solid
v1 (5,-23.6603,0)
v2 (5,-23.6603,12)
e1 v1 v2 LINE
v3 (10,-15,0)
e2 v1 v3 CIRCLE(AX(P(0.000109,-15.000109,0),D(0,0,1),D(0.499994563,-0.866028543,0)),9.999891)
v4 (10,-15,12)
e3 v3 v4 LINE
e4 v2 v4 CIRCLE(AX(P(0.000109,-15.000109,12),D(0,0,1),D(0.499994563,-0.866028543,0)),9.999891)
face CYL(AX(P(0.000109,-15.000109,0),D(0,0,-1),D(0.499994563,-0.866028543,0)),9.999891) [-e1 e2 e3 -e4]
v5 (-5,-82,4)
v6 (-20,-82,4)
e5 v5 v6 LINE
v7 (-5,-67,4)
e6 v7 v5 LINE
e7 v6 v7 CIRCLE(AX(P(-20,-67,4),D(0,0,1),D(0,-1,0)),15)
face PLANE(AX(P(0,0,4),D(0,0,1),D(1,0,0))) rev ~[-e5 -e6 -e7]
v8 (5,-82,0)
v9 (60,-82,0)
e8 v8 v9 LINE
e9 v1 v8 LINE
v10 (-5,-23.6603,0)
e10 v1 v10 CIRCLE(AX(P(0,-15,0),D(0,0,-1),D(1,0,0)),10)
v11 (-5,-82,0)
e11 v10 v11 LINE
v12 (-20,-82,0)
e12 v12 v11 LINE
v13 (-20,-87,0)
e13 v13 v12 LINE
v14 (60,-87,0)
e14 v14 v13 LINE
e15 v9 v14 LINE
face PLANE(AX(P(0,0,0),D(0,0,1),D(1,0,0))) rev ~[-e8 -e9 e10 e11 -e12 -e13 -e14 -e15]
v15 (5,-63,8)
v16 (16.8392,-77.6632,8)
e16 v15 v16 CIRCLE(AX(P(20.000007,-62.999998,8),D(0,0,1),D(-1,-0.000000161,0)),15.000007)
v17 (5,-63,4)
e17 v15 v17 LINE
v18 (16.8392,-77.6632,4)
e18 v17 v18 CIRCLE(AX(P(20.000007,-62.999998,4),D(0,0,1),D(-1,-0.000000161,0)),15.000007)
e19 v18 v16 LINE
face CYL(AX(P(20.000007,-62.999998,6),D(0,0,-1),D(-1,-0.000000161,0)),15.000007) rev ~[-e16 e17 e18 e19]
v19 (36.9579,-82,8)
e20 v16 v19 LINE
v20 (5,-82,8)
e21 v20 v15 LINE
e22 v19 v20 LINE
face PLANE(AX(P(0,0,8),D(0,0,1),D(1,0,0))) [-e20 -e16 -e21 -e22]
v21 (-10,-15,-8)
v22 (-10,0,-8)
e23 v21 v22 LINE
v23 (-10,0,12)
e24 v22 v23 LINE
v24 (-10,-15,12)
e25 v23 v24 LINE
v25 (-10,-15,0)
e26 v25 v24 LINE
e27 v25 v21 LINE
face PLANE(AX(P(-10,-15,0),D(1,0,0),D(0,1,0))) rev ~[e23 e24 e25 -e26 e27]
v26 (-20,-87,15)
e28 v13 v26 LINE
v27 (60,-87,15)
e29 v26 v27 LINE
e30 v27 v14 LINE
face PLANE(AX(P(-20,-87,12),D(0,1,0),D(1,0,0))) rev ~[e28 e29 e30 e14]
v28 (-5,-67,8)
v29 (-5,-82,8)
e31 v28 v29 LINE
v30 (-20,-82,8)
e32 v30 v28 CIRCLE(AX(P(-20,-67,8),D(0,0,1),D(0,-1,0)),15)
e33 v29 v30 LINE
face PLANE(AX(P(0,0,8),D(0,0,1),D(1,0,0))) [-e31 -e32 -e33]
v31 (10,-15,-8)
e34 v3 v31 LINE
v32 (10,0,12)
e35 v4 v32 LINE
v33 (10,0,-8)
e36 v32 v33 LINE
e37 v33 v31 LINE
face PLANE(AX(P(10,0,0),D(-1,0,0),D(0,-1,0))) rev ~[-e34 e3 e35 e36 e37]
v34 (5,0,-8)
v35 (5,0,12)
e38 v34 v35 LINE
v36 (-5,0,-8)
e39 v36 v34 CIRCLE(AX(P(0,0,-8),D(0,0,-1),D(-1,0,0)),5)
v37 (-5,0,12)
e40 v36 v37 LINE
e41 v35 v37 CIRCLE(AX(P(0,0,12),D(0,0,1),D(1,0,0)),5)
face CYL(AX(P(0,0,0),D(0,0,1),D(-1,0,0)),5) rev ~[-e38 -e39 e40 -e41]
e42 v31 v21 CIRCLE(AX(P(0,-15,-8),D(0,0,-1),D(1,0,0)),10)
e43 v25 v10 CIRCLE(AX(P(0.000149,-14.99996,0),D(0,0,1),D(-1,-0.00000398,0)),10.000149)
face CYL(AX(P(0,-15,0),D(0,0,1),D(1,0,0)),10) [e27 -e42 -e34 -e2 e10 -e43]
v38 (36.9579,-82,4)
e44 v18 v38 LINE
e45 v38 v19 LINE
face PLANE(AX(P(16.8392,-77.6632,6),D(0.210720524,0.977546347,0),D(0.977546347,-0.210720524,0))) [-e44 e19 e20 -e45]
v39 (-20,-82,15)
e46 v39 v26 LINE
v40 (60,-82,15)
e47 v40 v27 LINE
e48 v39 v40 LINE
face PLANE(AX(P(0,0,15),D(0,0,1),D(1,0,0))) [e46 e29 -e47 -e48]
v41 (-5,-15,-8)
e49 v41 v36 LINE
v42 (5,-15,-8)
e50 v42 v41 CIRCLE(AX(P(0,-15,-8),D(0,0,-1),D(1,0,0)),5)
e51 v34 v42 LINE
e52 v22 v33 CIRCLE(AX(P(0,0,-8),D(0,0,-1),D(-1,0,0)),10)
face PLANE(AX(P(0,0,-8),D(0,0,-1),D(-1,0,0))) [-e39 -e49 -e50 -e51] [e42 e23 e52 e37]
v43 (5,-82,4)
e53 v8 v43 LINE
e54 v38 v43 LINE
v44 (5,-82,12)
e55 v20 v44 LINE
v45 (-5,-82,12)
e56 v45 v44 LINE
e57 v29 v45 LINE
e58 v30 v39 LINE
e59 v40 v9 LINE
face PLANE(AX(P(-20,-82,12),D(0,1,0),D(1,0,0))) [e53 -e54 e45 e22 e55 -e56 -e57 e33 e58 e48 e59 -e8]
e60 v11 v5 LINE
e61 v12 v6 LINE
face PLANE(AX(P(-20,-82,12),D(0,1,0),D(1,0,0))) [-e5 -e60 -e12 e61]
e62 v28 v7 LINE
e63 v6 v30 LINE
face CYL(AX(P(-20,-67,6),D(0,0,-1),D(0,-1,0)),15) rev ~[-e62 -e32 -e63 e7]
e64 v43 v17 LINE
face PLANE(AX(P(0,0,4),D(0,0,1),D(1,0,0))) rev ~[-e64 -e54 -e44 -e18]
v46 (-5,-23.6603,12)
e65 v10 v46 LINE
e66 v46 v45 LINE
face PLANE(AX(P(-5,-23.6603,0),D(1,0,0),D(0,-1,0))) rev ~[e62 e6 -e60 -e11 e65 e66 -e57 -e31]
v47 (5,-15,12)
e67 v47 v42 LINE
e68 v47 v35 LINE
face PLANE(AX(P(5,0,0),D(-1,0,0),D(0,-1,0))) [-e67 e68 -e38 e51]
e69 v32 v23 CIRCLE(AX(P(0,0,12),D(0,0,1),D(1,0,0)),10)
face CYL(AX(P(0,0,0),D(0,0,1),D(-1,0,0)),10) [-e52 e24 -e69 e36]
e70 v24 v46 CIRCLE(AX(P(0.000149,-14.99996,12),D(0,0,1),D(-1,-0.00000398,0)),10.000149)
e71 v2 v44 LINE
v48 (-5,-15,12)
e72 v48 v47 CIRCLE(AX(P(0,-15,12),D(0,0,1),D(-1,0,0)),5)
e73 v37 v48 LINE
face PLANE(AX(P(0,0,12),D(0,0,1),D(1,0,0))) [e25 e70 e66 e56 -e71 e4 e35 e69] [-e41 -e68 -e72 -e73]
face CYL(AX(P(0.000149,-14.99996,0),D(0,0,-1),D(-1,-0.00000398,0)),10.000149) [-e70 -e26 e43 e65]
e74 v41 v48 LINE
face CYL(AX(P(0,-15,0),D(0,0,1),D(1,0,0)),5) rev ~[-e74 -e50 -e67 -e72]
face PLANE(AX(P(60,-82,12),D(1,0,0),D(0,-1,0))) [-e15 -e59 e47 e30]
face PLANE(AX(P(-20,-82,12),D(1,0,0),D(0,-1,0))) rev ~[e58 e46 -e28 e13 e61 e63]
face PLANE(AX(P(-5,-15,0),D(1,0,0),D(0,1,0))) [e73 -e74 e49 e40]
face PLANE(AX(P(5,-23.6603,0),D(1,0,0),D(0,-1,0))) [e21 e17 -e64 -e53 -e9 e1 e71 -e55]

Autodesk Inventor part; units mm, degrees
ref_plane "YZ Plane" through (0, 0, 0) normal (1, 0, 0) x (0, 1, 0)
ref_plane "XZ Plane" through (0, 0, 0) normal (0, 1, 0) x (-1, 0, 0)
sketch "Sketch1" plane through (0, 0, 0) normal (0, 0, 1) x (1, 0, 0)
  line L0 (0, 0) -> (0, -15) construction
  line L1 (-5, 0) -> (-5, -15)
  line L2 (5, -15) -> (5, 0)
  arc A0 (5, 0) -> (-5, 0) centre (0, 0) ccw
  arc A1 (-5, -15) -> (5, -15) centre (0, -15) ccw
  line L3 (0, 0) -> (0, -15) construction
  line L4 (-10, 0) -> (-10, -15)
  line L5 (10, -15) -> (10, 0)
  arc A2 (10, 0) -> (-10, 0) centre (0, 0) ccw
  line L6 (0, -15) -> (0, -87) construction
  line L7 (5, -23.6603) -> (5, -82)
  line L8 (-5, -23.6603) -> (-5, -82)
  arc A3 (-10, -15) -> (-5, -23.6603) centre (0, -15) ccw
  arc A4 (5, -23.6603) -> (10, -15) centre (0, -15) ccw
  line L9 (-20, -82) -> (60, -82)
  line L10 (60, -82) -> (60, -87)
  line L11 (60, -87) -> (-20, -87)
  line L12 (-20, -87) -> (-20, -82)
  point P0 (0, -7.5)
  point P1 (0, -7.5)
  dimension "d0" = 15
  dimension "d1" = 5
  dimension "d2" = 10
  dimension "d3" = 72
  dimension "d4" = 5
  dimension "d5" = 5
  dimension "d7" = 80
  dimension "d8" = 5
  dimension "d24" = 15
extrude "Extrusion1" add sketch "Sketch1" along normal blind 12
sketch "Sketch2" plane through (0, 0, 0) normal (0, 0, -1) x (-1, 0, 0)
  arc A0 (-5, -15) -> (5, -15) centre (0, -15) ccw projected
  line L0 (0, 0) -> (0, -15) construction
  line L1 (-10, 0) -> (-10, -15)
  line L2 (10, -15) -> (10, 0)
  arc A1 (10, 0) -> (-10, 0) centre (0, 0) ccw
  arc A2 (-10, -15) -> (10, -15) centre (0, -15) ccw
  line L3 (0, 0) -> (0, -15) construction
  line L4 (-5, 0) -> (-5, -15)
  line L5 (5, -15) -> (5, 0)
  arc A3 (5, 0) -> (-5, 0) centre (0, 0) ccw
  arc A4 (-5, -15) -> (5, -15) centre (0, -15) ccw
  point P0 (0, -7.5)
  point P1 (0, -7.5)
  point P2 (-5, -15)
  point P3 (5, -15)
  dimension "d11" = 10
  dimension "d12" = 5
extrude "Extrusion2" add sketch "Sketch2" along normal blind 8
sketch "Sketch3" plane through (0, 0, 12) normal (0, 0, 1) x (1, 0, 0)
  line L0 (-20, -82) -> (-20, -87) projected
  line L1 (-20, -87) -> (60, -87) projected
  line L2 (-20, -82) -> (60, -82)
  line L3 (60, -82) -> (60, -87)
  line L4 (60, -87) -> (-20, -87)
  line L5 (-20, -87) -> (-20, -82)
  point P0 (0, 0)
  dimension "d23" = 80
extrude "Extrusion3" add sketch "Sketch3" along normal blind 3
ref_plane "Work Plane1" through (0, 0, 6) normal (0, 0, 1) x (1, 0, 0)
sketch "Sketch4" plane through (0, 0, 6) normal (0, 0, 1) x (1, 0, 0)
  arc A0 (-20, -82) -> (-5, -67) centre (-20, -67) ccw
  line L0 (-5, -23.6603) -> (-5, -82) projected
  line L1 (60, -82) -> (-20, -82) projected
  line L2 (-5, -67) -> (-20, -67) construction
  line L3 (-20, -67) -> (-20, -82) construction
  line L4 (-20, -82) -> (-5, -82)
  line L5 (-5, -82) -> (-5, -67)
  arc A1 (5, -63) -> (16.8392, -77.6632) centre (20, -63) ccw
  line L6 (5, -82) -> (5, -23.6603) projected
  line L7 (16.8392, -77.6632) -> (36.9579, -82)
  line L8 (5, -82) -> (5, -63)
  point P0 (0, 0)
  point P1 (-20, -82)
  dimension "d17" = 15
  dimension "d18" = 30
  dimension "d20" = 19
extrude "Extrusion4" add sketch "Sketch4" along normal mid plane 4
properties part number "Stand"
